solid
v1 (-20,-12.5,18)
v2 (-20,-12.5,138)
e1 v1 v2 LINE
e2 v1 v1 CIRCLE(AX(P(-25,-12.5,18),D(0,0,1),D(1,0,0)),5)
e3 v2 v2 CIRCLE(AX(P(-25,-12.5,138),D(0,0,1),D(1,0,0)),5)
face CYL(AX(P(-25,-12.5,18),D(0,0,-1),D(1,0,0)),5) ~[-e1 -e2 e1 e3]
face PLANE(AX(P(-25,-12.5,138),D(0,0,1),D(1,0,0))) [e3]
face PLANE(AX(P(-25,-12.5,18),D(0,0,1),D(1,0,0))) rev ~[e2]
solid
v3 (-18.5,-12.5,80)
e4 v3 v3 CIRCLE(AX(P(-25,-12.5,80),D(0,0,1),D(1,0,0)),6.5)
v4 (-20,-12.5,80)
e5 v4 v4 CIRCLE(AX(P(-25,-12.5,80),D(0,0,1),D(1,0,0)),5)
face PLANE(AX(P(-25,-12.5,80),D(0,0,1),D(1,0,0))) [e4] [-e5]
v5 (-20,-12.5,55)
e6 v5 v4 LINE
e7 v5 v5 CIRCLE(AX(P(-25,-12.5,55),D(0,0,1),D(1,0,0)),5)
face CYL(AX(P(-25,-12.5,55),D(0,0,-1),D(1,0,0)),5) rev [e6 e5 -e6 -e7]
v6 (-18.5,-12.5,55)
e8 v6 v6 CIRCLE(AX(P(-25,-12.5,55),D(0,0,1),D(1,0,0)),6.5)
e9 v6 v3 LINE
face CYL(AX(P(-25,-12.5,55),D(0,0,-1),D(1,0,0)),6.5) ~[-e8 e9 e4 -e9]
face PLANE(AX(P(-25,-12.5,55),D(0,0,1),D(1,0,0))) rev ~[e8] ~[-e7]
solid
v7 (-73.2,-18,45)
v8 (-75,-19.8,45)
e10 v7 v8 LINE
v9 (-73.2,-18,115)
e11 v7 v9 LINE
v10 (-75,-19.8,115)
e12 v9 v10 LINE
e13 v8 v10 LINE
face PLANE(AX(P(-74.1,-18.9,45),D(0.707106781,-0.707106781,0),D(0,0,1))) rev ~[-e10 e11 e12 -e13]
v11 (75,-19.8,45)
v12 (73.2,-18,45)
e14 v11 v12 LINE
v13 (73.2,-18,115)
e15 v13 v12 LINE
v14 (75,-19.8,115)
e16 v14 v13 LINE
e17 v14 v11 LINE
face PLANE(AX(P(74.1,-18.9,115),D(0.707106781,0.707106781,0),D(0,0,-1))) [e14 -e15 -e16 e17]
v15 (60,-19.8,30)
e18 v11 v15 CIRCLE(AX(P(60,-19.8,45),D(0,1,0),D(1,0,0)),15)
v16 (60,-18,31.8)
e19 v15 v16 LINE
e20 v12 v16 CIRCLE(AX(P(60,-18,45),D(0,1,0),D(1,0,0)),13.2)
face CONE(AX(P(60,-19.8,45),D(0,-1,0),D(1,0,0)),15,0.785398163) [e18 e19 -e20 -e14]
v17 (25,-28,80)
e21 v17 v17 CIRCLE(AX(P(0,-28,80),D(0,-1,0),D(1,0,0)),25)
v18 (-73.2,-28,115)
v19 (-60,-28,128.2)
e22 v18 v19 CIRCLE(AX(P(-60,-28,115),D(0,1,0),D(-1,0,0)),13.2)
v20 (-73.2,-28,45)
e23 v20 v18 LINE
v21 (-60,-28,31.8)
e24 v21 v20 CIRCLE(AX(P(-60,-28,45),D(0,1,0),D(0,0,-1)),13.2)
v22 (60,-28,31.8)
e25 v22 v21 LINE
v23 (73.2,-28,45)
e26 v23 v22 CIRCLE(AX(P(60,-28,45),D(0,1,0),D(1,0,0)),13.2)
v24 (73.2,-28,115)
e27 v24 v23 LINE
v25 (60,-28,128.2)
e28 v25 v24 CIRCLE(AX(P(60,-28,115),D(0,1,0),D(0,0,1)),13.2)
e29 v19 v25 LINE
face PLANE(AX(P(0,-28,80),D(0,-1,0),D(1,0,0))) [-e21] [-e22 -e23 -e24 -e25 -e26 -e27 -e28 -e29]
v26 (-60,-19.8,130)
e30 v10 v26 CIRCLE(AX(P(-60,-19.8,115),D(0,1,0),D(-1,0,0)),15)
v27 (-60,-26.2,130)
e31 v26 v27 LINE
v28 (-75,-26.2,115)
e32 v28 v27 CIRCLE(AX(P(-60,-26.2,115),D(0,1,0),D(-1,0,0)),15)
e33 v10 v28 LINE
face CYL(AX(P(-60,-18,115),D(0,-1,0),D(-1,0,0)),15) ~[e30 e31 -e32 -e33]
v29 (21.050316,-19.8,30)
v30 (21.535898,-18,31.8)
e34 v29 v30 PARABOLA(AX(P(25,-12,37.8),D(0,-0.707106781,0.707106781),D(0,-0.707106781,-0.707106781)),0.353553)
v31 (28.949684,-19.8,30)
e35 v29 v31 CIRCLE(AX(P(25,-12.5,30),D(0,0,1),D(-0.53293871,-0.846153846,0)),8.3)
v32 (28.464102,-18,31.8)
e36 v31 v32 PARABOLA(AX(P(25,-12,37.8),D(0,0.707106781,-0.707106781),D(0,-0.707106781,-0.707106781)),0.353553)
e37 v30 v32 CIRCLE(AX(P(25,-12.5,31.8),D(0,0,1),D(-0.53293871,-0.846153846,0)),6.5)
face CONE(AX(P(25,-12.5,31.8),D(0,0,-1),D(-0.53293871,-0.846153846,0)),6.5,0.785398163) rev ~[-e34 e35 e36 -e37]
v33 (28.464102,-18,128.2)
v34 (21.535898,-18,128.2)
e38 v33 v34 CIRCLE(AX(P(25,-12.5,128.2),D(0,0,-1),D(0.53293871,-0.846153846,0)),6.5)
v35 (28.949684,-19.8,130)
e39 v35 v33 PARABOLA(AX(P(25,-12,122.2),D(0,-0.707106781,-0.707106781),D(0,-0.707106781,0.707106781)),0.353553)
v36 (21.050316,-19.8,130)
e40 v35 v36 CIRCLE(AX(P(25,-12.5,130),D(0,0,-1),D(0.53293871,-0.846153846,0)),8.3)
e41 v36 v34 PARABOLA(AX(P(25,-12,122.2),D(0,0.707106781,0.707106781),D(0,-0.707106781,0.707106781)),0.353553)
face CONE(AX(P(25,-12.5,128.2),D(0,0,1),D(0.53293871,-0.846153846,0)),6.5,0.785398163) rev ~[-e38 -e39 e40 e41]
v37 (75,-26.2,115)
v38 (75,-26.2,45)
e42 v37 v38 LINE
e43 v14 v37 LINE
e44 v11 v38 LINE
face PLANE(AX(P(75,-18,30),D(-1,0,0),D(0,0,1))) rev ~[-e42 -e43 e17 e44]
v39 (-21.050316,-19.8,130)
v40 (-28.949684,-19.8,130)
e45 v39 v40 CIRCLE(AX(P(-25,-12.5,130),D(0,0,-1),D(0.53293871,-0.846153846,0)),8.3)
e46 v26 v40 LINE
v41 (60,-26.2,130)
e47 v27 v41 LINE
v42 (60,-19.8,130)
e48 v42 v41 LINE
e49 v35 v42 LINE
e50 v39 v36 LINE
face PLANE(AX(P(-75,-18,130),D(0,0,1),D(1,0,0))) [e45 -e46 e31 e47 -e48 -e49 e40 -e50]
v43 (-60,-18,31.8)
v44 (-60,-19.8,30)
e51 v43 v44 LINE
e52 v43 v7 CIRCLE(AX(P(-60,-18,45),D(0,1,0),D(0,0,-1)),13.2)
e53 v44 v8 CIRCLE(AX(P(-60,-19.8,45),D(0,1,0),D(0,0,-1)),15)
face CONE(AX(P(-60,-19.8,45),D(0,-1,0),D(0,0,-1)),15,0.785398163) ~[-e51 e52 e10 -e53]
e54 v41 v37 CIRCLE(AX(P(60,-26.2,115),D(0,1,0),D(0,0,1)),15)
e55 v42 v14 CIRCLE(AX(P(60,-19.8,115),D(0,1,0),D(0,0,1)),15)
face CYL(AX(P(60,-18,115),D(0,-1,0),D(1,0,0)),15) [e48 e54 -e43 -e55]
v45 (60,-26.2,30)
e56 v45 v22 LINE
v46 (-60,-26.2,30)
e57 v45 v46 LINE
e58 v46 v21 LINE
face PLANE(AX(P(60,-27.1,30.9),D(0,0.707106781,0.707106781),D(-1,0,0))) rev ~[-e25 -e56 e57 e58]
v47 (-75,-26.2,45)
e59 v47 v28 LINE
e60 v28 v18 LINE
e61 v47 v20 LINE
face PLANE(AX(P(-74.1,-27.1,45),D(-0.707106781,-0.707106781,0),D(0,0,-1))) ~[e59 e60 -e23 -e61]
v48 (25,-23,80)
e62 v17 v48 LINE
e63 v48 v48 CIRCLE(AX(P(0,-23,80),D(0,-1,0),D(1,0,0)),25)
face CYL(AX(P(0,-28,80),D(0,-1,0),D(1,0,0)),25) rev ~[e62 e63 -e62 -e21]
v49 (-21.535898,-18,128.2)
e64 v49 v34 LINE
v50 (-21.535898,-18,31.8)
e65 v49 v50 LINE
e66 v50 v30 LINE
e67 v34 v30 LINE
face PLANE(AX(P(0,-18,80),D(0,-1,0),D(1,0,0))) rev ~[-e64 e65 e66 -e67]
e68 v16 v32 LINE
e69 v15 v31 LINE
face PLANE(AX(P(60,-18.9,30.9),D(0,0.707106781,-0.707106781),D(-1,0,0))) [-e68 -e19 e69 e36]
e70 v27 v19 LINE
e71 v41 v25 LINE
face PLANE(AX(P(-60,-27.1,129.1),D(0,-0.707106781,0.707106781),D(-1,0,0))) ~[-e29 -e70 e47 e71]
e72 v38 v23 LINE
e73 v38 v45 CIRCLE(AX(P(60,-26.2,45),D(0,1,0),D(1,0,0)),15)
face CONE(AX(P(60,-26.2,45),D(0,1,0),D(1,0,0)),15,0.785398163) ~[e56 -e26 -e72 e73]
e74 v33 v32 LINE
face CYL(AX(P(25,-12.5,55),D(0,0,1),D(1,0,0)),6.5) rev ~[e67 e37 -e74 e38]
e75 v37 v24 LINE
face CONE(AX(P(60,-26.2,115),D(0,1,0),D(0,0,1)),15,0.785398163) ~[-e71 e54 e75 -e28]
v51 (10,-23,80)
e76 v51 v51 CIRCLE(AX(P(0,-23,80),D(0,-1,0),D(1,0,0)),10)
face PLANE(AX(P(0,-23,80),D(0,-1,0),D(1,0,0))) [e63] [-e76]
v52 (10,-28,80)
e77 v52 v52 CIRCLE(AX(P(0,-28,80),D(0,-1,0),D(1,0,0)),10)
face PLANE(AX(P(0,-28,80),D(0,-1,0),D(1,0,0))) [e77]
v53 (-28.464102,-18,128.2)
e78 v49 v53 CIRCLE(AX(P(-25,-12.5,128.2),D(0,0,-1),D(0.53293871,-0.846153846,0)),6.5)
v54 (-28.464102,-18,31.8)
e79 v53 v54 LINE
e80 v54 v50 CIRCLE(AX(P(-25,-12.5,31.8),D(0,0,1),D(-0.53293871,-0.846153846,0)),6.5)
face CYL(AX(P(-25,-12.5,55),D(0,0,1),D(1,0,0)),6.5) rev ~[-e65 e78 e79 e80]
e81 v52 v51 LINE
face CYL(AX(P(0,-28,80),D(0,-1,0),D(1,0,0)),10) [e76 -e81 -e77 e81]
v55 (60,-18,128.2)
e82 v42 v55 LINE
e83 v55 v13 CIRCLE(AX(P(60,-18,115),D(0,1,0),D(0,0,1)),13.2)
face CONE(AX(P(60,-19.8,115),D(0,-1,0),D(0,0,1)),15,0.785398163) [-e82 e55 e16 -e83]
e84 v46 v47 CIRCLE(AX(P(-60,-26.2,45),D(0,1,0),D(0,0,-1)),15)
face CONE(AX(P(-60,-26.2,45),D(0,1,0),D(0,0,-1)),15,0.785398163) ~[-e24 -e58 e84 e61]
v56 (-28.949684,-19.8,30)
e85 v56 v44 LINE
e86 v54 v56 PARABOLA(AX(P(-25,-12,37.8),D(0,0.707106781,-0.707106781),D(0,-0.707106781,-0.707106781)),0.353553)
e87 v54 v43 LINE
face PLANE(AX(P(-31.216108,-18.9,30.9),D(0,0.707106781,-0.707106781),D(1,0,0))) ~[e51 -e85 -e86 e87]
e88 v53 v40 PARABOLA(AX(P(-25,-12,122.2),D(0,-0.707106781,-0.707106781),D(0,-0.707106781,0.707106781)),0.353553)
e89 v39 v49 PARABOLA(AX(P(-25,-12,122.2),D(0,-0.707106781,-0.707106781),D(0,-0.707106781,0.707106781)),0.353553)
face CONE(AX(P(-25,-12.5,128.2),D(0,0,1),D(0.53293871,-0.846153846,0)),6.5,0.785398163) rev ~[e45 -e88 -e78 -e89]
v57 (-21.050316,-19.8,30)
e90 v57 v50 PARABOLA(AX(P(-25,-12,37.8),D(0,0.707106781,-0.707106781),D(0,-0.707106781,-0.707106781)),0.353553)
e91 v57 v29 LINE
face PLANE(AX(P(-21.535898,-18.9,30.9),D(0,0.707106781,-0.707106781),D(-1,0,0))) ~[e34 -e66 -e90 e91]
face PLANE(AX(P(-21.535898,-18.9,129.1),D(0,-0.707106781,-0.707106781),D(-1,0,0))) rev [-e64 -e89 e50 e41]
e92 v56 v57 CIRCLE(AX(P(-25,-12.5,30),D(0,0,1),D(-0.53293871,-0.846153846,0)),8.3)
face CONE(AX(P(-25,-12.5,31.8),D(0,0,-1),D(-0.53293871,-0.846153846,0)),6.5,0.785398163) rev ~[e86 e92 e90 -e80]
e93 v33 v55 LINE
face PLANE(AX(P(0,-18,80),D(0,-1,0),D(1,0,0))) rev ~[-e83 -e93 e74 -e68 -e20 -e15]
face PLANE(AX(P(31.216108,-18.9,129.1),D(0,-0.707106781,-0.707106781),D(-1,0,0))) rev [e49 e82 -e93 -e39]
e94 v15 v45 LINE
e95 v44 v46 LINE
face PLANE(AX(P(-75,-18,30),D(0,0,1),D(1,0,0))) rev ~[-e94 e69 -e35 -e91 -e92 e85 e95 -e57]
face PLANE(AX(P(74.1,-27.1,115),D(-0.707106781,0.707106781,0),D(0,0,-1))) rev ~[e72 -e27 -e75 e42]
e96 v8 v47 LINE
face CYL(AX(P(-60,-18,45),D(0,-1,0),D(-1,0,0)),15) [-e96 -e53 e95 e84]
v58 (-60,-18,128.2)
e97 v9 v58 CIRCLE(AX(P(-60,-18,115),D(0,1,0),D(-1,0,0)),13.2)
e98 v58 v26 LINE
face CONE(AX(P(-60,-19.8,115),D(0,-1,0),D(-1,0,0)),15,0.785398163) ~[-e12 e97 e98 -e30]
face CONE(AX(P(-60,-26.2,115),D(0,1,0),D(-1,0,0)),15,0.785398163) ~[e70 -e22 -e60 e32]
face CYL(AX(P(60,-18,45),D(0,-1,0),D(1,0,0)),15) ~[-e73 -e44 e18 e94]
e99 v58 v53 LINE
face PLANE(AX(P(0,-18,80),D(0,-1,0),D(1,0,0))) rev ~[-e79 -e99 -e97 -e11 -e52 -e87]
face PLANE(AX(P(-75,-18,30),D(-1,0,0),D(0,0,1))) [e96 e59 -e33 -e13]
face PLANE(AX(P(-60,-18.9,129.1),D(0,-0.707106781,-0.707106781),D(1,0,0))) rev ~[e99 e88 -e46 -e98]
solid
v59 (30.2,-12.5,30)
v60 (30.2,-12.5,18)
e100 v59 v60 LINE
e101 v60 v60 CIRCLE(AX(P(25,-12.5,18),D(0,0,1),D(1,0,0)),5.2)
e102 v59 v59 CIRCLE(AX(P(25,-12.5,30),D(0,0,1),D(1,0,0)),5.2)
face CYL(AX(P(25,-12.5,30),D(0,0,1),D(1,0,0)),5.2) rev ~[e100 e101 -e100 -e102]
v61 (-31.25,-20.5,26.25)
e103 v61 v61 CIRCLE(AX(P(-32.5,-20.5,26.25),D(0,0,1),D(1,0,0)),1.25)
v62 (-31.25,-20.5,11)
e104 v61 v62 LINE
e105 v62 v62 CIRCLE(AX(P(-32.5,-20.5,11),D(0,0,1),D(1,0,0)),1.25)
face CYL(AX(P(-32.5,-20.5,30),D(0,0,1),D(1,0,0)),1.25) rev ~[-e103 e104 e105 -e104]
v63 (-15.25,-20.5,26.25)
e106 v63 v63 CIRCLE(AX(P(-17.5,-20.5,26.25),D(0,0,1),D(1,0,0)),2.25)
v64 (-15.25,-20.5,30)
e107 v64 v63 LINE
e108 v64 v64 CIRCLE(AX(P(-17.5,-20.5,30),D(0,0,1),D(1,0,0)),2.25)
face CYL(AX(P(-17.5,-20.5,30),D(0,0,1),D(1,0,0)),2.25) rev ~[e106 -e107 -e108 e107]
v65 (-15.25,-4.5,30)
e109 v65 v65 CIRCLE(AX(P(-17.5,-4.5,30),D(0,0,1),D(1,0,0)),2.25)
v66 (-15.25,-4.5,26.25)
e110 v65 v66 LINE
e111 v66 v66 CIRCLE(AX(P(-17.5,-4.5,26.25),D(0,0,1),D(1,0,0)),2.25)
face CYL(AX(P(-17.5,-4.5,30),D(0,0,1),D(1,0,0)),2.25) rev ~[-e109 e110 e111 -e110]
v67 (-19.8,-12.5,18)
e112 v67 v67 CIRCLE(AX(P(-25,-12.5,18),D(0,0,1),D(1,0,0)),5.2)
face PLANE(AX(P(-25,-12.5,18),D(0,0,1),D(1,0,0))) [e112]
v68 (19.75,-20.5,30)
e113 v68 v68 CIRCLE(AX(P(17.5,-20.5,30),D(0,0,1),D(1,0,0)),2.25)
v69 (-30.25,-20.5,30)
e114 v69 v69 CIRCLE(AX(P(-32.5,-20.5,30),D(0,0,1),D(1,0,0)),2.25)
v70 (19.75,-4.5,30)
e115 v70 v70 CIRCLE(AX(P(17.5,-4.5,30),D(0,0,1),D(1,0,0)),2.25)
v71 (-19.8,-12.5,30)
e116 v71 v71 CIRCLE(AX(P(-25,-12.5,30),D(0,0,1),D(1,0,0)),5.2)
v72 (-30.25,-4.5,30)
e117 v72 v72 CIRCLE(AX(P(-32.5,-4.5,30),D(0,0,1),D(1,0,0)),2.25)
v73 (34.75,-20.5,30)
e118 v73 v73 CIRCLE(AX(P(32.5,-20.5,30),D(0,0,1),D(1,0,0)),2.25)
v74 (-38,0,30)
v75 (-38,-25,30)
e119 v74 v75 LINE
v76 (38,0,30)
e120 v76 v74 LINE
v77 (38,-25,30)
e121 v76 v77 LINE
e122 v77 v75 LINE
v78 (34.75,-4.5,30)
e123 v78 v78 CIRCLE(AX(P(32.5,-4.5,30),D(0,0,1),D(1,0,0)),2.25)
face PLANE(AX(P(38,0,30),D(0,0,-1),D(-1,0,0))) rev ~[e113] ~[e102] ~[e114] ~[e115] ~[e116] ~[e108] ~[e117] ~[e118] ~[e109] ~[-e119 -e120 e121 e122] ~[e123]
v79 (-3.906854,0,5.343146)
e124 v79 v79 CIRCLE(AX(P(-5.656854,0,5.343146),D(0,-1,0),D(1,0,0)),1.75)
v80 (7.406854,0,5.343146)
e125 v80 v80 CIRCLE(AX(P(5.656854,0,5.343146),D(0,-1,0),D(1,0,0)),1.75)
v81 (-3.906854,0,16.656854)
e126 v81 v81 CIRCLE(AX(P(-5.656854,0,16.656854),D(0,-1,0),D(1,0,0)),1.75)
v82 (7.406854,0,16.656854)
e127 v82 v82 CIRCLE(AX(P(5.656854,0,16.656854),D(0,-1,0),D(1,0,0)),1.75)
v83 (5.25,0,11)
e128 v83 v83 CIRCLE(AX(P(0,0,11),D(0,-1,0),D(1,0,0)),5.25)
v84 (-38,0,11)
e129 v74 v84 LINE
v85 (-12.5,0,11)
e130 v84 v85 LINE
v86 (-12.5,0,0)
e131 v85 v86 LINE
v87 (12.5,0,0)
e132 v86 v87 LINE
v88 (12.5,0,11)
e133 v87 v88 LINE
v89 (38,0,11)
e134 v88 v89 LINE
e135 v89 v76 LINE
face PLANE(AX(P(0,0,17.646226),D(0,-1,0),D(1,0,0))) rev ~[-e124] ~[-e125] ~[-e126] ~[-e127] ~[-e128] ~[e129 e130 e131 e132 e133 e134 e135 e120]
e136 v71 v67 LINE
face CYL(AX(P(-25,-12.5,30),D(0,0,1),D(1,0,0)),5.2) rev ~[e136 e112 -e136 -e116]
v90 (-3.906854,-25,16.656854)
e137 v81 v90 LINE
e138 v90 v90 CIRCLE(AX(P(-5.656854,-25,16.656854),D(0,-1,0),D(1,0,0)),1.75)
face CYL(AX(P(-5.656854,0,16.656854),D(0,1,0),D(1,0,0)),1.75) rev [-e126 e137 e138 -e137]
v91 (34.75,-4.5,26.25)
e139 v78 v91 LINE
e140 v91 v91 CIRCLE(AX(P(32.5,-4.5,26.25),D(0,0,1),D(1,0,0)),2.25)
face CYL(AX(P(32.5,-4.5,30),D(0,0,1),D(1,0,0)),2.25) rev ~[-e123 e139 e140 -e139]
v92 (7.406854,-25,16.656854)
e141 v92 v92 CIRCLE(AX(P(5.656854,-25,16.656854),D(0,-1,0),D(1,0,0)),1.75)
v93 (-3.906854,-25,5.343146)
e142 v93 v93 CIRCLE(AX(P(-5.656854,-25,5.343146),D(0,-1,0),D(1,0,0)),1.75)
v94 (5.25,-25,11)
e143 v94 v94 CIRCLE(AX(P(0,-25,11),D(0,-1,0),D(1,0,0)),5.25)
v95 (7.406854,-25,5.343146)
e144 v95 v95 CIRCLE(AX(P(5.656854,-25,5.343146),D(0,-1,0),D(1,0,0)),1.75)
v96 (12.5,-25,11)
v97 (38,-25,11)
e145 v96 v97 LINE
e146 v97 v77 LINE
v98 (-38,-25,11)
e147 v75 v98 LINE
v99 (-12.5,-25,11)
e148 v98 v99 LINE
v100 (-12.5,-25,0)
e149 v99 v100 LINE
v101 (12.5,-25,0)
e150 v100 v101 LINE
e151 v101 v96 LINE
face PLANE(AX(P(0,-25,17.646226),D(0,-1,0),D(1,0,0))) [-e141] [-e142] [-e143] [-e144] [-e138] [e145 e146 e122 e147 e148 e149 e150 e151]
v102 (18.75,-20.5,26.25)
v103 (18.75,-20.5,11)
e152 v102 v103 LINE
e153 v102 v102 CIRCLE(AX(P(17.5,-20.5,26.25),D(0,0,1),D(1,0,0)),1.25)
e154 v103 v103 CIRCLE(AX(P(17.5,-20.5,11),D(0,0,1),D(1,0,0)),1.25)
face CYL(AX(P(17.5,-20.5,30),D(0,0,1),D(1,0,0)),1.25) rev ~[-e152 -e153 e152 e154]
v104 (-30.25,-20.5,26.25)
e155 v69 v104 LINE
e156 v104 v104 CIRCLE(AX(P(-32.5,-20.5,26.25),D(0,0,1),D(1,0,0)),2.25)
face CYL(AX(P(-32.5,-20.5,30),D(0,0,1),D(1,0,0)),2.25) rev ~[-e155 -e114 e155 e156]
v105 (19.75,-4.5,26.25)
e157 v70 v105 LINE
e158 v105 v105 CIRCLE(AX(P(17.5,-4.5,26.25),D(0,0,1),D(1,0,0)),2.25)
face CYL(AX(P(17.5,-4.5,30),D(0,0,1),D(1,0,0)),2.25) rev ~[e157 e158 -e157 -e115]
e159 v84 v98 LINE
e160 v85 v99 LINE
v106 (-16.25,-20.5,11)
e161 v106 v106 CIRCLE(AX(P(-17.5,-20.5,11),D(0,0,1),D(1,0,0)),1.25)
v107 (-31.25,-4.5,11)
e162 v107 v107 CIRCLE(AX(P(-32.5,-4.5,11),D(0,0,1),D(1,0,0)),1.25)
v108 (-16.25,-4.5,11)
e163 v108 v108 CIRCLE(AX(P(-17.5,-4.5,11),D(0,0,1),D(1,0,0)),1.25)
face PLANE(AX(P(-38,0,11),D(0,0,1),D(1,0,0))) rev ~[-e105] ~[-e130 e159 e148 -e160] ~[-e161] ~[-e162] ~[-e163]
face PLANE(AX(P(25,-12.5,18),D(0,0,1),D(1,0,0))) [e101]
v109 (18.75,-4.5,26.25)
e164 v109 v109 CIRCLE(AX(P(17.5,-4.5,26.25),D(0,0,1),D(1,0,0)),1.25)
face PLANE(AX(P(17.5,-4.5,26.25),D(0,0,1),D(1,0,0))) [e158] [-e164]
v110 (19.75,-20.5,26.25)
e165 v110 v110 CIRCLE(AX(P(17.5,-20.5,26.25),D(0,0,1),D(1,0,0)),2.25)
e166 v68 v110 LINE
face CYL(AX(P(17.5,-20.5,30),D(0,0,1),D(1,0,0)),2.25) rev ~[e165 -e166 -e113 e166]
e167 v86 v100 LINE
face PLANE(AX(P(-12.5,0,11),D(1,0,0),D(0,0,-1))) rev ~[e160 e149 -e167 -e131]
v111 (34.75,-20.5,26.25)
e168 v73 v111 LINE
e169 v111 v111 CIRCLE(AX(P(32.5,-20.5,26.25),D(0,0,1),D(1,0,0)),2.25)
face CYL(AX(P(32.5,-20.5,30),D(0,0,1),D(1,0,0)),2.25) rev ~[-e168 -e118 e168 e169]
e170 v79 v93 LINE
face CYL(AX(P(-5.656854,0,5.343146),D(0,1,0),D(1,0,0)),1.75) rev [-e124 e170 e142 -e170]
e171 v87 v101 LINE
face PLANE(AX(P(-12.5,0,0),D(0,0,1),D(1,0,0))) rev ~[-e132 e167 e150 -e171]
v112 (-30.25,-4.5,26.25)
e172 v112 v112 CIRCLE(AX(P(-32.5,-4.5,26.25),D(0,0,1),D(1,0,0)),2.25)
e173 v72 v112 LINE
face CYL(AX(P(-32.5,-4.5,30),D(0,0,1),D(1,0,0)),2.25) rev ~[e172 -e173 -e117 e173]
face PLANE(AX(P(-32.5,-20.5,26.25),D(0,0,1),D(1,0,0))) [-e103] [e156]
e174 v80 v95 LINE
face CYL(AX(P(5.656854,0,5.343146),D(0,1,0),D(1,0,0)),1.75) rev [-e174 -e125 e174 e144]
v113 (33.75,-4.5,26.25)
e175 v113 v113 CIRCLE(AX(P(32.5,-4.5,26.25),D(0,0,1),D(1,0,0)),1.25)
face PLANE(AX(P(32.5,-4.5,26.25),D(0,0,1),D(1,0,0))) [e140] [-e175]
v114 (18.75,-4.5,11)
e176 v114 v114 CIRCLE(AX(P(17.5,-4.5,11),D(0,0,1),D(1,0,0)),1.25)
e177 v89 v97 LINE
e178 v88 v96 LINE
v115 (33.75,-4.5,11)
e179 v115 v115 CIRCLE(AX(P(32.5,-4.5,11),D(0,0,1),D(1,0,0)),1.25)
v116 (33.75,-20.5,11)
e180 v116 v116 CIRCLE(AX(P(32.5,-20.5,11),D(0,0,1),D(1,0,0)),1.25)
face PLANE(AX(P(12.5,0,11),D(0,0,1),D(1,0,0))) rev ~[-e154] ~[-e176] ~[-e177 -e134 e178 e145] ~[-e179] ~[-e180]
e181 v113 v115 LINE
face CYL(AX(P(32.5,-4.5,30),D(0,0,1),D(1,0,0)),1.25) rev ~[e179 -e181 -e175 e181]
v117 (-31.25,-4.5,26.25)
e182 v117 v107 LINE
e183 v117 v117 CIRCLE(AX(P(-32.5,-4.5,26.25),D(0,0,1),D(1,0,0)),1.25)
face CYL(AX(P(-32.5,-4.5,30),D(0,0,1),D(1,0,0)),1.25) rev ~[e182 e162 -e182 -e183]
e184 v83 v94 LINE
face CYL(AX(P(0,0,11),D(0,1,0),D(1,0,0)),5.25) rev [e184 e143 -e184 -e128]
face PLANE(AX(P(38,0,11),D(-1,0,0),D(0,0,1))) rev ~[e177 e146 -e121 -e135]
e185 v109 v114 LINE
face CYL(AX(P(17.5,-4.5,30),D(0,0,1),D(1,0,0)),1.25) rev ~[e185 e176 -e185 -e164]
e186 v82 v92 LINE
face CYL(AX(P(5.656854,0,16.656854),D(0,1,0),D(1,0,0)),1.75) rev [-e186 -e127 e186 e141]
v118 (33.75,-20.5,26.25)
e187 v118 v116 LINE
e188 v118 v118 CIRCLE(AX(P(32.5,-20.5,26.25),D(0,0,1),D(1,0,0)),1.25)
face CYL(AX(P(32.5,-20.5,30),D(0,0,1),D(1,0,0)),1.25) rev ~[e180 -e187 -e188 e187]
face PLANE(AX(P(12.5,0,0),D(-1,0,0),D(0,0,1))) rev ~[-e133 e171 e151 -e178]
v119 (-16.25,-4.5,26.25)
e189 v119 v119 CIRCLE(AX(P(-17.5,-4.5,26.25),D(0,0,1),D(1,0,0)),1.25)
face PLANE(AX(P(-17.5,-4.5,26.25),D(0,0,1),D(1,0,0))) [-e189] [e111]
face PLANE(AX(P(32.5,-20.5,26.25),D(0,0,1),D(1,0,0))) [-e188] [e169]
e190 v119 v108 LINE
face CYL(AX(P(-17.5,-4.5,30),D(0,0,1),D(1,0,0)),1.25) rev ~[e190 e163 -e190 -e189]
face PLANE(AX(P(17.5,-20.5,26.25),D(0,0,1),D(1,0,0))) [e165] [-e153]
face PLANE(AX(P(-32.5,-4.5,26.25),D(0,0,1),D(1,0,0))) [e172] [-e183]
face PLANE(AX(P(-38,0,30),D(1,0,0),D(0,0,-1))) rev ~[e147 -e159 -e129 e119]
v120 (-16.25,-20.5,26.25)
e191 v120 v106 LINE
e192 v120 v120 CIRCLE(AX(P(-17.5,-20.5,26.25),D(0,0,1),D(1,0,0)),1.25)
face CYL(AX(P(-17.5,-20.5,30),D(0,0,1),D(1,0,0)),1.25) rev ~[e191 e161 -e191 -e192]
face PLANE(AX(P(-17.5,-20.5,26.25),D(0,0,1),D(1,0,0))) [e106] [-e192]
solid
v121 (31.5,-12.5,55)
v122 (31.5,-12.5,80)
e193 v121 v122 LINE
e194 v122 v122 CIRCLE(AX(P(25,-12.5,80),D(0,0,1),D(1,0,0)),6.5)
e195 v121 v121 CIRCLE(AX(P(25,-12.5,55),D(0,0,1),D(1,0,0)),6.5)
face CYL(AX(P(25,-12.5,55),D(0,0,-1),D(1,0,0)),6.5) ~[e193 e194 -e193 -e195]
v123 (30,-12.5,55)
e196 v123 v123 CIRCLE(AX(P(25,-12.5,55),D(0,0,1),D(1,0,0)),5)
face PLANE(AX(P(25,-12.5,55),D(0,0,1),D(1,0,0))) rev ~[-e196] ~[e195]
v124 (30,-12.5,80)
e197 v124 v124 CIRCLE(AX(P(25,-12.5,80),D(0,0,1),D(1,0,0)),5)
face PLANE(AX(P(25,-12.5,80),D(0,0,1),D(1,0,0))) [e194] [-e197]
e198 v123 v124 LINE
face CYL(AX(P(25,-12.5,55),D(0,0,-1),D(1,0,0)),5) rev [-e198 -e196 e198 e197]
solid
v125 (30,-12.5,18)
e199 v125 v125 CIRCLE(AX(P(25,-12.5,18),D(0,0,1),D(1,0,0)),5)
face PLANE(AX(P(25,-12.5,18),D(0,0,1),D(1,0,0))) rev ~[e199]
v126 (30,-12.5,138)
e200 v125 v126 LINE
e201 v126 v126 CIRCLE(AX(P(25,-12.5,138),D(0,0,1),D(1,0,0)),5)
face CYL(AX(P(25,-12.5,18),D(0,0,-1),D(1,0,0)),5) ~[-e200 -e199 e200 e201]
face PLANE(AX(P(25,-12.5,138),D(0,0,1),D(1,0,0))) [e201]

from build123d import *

# Parameters (mm, degrees)
F0_R           = 1.75
F0_R_2         = 5.25
F1_DEPTH       = 25
F2_R           = 1.25
F3_DEPTH       = 19
F2_R_2         = 2.25
F4_DEPTH       = 3.75
F5_R           = 5.2
F6_DEPTH       = 12
F7_R           = 5
F8_DEPTH       = 120
F10_R          = 6.5
F10_R_2        = 5
F11_DEPTH      = 25
F13_W          = 150
F13_H          = 100
F14_DEPTH      = 10
F15_R          = 25
F15_R_2        = 10
F16_DEPTH      = 5
F17_DEPTH      = 55.001
F17_DEPTH_BACK = 83.001
F18_R          = 15
F19_C1_SIZE    = 1.8
F19_C2_SIZE    = 1.8


with BuildPart() as f1:
    # F0 (on Front) → F1 (new body)
    with BuildSketch(Plane.XZ):
        Polygon((38, 11), (38, 30), (-38, 30), (-38, 11), (-12.5, 11), (-12.5, 0), (12.5, 0), (12.5, 11), align=None)
        with Locations((-5.6568542495, 5.3431457505)):
            Circle(F0_R, mode=Mode.SUBTRACT)
        with Locations((5.6568542495, 5.3431457505)):
            Circle(F0_R, mode=Mode.SUBTRACT)
        with Locations((0, 11)):
            Circle(F0_R_2, mode=Mode.SUBTRACT)
        with Locations((-5.6568542495, 16.6568542495)):
            Circle(F0_R, mode=Mode.SUBTRACT)
        with Locations((5.6568542495, 16.6568542495)):
            Circle(F0_R, mode=Mode.SUBTRACT)
    extrude(amount=F1_DEPTH)

    # F2 (on face) → F3 (cut, through all)
    with BuildSketch(Plane.XY.offset(30)):
        with Locations((-32.5, -20.5)):
            Circle(F2_R)
        with Locations((-32.5, -4.5)):
            Circle(F2_R)
        with Locations((-17.5, -4.5)):
            Circle(F2_R)
        with Locations((-17.5, -20.5)):
            Circle(F2_R)
        with Locations((17.5, -4.5)):
            Circle(F2_R)
        with Locations((17.5, -20.5)):
            Circle(F2_R)
        with Locations((32.5, -20.5)):
            Circle(F2_R)
        with Locations((32.5, -4.5)):
            Circle(F2_R)
    extrude(amount=-F3_DEPTH, mode=Mode.SUBTRACT)

    # F2 (on face) → F4 (cut)
    with BuildSketch(Plane.XY.offset(30)):
        with Locations((17.5, -4.5)):
            Circle(F2_R_2)
        with Locations((17.5, -4.5)):
            Circle(F2_R, mode=Mode.SUBTRACT)
        with Locations((17.5, -20.5)):
            Circle(F2_R_2)
        with Locations((17.5, -20.5)):
            Circle(F2_R, mode=Mode.SUBTRACT)
        with Locations((32.5, -20.5)):
            Circle(F2_R_2)
        with Locations((32.5, -20.5)):
            Circle(F2_R, mode=Mode.SUBTRACT)
        with Locations((32.5, -4.5)):
            Circle(F2_R_2)
        with Locations((32.5, -4.5)):
            Circle(F2_R, mode=Mode.SUBTRACT)
        with Locations((-32.5, -4.5)):
            Circle(F2_R_2)
        with Locations((-32.5, -4.5)):
            Circle(F2_R, mode=Mode.SUBTRACT)
        with Locations((-17.5, -4.5)):
            Circle(F2_R_2)
        with Locations((-17.5, -4.5)):
            Circle(F2_R, mode=Mode.SUBTRACT)
        with Locations((-17.5, -20.5)):
            Circle(F2_R_2)
        with Locations((-17.5, -20.5)):
            Circle(F2_R, mode=Mode.SUBTRACT)
        with Locations((-32.5, -20.5)):
            Circle(F2_R_2)
        with Locations((-32.5, -20.5)):
            Circle(F2_R, mode=Mode.SUBTRACT)
    extrude(amount=-F4_DEPTH, mode=Mode.SUBTRACT)

    # F5 (on face) → F6 (cut)
    with BuildSketch(Plane.XY.offset(30)):
        with Locations((-25, -12.5)):
            Circle(F5_R)
        with Locations((25, -12.5)):
            Circle(F5_R)
    extrude(amount=-F6_DEPTH, mode=Mode.SUBTRACT)


with BuildPart() as f8:
    # F7 (on face) → F8 (new body)
    with BuildSketch(Plane.XY.offset(18)):
        with Locations((-25, -12.5)):
            Circle(F7_R)
    extrude(amount=F8_DEPTH)


with BuildPart() as f8b:
    # F7 (on face) → F8, piece 2 (new body)
    with BuildSketch(Plane.XY.offset(18)):
        with Locations((25, -12.5)):
            Circle(F7_R)
    extrude(amount=F8_DEPTH)


with BuildPart() as f11:
    # F10 (on offset) → F11 (new body)
    with BuildSketch(Plane.XY.offset(55)):
        with Locations((25, -12.5)):
            Circle(F10_R)
        with Locations((25, -12.5)):
            Circle(F10_R_2, mode=Mode.SUBTRACT)
    extrude(amount=F11_DEPTH)


with BuildPart() as f11b:
    # F10 (on offset) → F11, piece 2 (new body)
    with BuildSketch(Plane.XY.offset(55)):
        with Locations((-25, -12.5)):
            Circle(F10_R)
        with Locations((-25, -12.5)):
            Circle(F10_R_2, mode=Mode.SUBTRACT)
    extrude(amount=F11_DEPTH)


with BuildPart() as f14:
    # F13 (on offset) → F14 (new body)
    with BuildSketch(Plane.XZ.offset(18)):
        with Locations((0, 80)):
            Rectangle(F13_W, F13_H)
    extrude(amount=F14_DEPTH)

    # F15 (on face) → F16 (cut)
    with BuildSketch(Plane.XZ.offset(28)):
        with Locations((0, 80)):
            Circle(F15_R)
        with Locations((0, 80)):
            Circle(F15_R_2, mode=Mode.SUBTRACT)
    extrude(amount=-F16_DEPTH, mode=Mode.SUBTRACT)

    # F10 (on offset) → F17 (cut, two sides)
    with BuildSketch(Plane.XY.offset(55)) as f17_sk:
        with Locations((25, -12.5)):
            Circle(F10_R)
        with Locations((25, -12.5)):
            Circle(F10_R_2, mode=Mode.SUBTRACT)
        with Locations((-25, -12.5)):
            Circle(F10_R)
        with Locations((-25, -12.5)):
            Circle(F10_R_2, mode=Mode.SUBTRACT)
    extrude(amount=-F17_DEPTH, mode=Mode.SUBTRACT)
    extrude(f17_sk.sketch, amount=F17_DEPTH_BACK, mode=Mode.SUBTRACT)

    # F18
    f18_edges = [f14.edges().sort_by_distance(p)[0] for p in [
        (-75, -23, 130),
        (-75, -23, 30),
        (75, -23, 30),
        (75, -23, 130),
    ]]
    fillet(f18_edges, radius=F18_R)

    # F19: chamfer of 1.8 on 32 edges, made by hand

    # F19_c1
    f19_c1_edges = [f14.edges().sort_by_distance(p)[0] for p in [
        (25, -19, 130),
        (0, -18, 130),
        (-25, -19, 130),
        (-25, -19, 30),
        (0, -18, 30),
        (25, -19, 30),
    ]]
    chamfer(f19_c1_edges, length=F19_C1_SIZE)

    # F19_c2
    f19_c2_edges = [f14.edges().sort_by_distance(p)[0] for p in [
        (45.6080540536, -18, 130),
        (0, -28, 130),
        (-45.6080540536, -18, 130),
        (-70.6066017178, -18, 125.6066017178),
        (-70.6066017178, -28, 125.6066017178),
        (-75, -18, 80),
        (-75, -28, 80),
        (-70.6066017178, -18, 34.3933982822),
        (-70.6066017178, -28, 34.3933982822),
        (-45.6080540536, -18, 30),
        (0, -28, 30),
        (45.6080540536, -18, 30),
        (70.6066017178, -18, 34.3933982822),
        (70.6066017178, -28, 34.3933982822),
        (75, -18, 80),
        (75, -28, 80),
        (70.6066017178, -18, 125.6066017178),
        (70.6066017178, -28, 125.6066017178),
    ]]
    chamfer(f19_c2_edges, length=F19_C2_SIZE)


solid = Compound([f1.part, f8.part, f8b.part, f11.part, f11b.part, f14.part])
